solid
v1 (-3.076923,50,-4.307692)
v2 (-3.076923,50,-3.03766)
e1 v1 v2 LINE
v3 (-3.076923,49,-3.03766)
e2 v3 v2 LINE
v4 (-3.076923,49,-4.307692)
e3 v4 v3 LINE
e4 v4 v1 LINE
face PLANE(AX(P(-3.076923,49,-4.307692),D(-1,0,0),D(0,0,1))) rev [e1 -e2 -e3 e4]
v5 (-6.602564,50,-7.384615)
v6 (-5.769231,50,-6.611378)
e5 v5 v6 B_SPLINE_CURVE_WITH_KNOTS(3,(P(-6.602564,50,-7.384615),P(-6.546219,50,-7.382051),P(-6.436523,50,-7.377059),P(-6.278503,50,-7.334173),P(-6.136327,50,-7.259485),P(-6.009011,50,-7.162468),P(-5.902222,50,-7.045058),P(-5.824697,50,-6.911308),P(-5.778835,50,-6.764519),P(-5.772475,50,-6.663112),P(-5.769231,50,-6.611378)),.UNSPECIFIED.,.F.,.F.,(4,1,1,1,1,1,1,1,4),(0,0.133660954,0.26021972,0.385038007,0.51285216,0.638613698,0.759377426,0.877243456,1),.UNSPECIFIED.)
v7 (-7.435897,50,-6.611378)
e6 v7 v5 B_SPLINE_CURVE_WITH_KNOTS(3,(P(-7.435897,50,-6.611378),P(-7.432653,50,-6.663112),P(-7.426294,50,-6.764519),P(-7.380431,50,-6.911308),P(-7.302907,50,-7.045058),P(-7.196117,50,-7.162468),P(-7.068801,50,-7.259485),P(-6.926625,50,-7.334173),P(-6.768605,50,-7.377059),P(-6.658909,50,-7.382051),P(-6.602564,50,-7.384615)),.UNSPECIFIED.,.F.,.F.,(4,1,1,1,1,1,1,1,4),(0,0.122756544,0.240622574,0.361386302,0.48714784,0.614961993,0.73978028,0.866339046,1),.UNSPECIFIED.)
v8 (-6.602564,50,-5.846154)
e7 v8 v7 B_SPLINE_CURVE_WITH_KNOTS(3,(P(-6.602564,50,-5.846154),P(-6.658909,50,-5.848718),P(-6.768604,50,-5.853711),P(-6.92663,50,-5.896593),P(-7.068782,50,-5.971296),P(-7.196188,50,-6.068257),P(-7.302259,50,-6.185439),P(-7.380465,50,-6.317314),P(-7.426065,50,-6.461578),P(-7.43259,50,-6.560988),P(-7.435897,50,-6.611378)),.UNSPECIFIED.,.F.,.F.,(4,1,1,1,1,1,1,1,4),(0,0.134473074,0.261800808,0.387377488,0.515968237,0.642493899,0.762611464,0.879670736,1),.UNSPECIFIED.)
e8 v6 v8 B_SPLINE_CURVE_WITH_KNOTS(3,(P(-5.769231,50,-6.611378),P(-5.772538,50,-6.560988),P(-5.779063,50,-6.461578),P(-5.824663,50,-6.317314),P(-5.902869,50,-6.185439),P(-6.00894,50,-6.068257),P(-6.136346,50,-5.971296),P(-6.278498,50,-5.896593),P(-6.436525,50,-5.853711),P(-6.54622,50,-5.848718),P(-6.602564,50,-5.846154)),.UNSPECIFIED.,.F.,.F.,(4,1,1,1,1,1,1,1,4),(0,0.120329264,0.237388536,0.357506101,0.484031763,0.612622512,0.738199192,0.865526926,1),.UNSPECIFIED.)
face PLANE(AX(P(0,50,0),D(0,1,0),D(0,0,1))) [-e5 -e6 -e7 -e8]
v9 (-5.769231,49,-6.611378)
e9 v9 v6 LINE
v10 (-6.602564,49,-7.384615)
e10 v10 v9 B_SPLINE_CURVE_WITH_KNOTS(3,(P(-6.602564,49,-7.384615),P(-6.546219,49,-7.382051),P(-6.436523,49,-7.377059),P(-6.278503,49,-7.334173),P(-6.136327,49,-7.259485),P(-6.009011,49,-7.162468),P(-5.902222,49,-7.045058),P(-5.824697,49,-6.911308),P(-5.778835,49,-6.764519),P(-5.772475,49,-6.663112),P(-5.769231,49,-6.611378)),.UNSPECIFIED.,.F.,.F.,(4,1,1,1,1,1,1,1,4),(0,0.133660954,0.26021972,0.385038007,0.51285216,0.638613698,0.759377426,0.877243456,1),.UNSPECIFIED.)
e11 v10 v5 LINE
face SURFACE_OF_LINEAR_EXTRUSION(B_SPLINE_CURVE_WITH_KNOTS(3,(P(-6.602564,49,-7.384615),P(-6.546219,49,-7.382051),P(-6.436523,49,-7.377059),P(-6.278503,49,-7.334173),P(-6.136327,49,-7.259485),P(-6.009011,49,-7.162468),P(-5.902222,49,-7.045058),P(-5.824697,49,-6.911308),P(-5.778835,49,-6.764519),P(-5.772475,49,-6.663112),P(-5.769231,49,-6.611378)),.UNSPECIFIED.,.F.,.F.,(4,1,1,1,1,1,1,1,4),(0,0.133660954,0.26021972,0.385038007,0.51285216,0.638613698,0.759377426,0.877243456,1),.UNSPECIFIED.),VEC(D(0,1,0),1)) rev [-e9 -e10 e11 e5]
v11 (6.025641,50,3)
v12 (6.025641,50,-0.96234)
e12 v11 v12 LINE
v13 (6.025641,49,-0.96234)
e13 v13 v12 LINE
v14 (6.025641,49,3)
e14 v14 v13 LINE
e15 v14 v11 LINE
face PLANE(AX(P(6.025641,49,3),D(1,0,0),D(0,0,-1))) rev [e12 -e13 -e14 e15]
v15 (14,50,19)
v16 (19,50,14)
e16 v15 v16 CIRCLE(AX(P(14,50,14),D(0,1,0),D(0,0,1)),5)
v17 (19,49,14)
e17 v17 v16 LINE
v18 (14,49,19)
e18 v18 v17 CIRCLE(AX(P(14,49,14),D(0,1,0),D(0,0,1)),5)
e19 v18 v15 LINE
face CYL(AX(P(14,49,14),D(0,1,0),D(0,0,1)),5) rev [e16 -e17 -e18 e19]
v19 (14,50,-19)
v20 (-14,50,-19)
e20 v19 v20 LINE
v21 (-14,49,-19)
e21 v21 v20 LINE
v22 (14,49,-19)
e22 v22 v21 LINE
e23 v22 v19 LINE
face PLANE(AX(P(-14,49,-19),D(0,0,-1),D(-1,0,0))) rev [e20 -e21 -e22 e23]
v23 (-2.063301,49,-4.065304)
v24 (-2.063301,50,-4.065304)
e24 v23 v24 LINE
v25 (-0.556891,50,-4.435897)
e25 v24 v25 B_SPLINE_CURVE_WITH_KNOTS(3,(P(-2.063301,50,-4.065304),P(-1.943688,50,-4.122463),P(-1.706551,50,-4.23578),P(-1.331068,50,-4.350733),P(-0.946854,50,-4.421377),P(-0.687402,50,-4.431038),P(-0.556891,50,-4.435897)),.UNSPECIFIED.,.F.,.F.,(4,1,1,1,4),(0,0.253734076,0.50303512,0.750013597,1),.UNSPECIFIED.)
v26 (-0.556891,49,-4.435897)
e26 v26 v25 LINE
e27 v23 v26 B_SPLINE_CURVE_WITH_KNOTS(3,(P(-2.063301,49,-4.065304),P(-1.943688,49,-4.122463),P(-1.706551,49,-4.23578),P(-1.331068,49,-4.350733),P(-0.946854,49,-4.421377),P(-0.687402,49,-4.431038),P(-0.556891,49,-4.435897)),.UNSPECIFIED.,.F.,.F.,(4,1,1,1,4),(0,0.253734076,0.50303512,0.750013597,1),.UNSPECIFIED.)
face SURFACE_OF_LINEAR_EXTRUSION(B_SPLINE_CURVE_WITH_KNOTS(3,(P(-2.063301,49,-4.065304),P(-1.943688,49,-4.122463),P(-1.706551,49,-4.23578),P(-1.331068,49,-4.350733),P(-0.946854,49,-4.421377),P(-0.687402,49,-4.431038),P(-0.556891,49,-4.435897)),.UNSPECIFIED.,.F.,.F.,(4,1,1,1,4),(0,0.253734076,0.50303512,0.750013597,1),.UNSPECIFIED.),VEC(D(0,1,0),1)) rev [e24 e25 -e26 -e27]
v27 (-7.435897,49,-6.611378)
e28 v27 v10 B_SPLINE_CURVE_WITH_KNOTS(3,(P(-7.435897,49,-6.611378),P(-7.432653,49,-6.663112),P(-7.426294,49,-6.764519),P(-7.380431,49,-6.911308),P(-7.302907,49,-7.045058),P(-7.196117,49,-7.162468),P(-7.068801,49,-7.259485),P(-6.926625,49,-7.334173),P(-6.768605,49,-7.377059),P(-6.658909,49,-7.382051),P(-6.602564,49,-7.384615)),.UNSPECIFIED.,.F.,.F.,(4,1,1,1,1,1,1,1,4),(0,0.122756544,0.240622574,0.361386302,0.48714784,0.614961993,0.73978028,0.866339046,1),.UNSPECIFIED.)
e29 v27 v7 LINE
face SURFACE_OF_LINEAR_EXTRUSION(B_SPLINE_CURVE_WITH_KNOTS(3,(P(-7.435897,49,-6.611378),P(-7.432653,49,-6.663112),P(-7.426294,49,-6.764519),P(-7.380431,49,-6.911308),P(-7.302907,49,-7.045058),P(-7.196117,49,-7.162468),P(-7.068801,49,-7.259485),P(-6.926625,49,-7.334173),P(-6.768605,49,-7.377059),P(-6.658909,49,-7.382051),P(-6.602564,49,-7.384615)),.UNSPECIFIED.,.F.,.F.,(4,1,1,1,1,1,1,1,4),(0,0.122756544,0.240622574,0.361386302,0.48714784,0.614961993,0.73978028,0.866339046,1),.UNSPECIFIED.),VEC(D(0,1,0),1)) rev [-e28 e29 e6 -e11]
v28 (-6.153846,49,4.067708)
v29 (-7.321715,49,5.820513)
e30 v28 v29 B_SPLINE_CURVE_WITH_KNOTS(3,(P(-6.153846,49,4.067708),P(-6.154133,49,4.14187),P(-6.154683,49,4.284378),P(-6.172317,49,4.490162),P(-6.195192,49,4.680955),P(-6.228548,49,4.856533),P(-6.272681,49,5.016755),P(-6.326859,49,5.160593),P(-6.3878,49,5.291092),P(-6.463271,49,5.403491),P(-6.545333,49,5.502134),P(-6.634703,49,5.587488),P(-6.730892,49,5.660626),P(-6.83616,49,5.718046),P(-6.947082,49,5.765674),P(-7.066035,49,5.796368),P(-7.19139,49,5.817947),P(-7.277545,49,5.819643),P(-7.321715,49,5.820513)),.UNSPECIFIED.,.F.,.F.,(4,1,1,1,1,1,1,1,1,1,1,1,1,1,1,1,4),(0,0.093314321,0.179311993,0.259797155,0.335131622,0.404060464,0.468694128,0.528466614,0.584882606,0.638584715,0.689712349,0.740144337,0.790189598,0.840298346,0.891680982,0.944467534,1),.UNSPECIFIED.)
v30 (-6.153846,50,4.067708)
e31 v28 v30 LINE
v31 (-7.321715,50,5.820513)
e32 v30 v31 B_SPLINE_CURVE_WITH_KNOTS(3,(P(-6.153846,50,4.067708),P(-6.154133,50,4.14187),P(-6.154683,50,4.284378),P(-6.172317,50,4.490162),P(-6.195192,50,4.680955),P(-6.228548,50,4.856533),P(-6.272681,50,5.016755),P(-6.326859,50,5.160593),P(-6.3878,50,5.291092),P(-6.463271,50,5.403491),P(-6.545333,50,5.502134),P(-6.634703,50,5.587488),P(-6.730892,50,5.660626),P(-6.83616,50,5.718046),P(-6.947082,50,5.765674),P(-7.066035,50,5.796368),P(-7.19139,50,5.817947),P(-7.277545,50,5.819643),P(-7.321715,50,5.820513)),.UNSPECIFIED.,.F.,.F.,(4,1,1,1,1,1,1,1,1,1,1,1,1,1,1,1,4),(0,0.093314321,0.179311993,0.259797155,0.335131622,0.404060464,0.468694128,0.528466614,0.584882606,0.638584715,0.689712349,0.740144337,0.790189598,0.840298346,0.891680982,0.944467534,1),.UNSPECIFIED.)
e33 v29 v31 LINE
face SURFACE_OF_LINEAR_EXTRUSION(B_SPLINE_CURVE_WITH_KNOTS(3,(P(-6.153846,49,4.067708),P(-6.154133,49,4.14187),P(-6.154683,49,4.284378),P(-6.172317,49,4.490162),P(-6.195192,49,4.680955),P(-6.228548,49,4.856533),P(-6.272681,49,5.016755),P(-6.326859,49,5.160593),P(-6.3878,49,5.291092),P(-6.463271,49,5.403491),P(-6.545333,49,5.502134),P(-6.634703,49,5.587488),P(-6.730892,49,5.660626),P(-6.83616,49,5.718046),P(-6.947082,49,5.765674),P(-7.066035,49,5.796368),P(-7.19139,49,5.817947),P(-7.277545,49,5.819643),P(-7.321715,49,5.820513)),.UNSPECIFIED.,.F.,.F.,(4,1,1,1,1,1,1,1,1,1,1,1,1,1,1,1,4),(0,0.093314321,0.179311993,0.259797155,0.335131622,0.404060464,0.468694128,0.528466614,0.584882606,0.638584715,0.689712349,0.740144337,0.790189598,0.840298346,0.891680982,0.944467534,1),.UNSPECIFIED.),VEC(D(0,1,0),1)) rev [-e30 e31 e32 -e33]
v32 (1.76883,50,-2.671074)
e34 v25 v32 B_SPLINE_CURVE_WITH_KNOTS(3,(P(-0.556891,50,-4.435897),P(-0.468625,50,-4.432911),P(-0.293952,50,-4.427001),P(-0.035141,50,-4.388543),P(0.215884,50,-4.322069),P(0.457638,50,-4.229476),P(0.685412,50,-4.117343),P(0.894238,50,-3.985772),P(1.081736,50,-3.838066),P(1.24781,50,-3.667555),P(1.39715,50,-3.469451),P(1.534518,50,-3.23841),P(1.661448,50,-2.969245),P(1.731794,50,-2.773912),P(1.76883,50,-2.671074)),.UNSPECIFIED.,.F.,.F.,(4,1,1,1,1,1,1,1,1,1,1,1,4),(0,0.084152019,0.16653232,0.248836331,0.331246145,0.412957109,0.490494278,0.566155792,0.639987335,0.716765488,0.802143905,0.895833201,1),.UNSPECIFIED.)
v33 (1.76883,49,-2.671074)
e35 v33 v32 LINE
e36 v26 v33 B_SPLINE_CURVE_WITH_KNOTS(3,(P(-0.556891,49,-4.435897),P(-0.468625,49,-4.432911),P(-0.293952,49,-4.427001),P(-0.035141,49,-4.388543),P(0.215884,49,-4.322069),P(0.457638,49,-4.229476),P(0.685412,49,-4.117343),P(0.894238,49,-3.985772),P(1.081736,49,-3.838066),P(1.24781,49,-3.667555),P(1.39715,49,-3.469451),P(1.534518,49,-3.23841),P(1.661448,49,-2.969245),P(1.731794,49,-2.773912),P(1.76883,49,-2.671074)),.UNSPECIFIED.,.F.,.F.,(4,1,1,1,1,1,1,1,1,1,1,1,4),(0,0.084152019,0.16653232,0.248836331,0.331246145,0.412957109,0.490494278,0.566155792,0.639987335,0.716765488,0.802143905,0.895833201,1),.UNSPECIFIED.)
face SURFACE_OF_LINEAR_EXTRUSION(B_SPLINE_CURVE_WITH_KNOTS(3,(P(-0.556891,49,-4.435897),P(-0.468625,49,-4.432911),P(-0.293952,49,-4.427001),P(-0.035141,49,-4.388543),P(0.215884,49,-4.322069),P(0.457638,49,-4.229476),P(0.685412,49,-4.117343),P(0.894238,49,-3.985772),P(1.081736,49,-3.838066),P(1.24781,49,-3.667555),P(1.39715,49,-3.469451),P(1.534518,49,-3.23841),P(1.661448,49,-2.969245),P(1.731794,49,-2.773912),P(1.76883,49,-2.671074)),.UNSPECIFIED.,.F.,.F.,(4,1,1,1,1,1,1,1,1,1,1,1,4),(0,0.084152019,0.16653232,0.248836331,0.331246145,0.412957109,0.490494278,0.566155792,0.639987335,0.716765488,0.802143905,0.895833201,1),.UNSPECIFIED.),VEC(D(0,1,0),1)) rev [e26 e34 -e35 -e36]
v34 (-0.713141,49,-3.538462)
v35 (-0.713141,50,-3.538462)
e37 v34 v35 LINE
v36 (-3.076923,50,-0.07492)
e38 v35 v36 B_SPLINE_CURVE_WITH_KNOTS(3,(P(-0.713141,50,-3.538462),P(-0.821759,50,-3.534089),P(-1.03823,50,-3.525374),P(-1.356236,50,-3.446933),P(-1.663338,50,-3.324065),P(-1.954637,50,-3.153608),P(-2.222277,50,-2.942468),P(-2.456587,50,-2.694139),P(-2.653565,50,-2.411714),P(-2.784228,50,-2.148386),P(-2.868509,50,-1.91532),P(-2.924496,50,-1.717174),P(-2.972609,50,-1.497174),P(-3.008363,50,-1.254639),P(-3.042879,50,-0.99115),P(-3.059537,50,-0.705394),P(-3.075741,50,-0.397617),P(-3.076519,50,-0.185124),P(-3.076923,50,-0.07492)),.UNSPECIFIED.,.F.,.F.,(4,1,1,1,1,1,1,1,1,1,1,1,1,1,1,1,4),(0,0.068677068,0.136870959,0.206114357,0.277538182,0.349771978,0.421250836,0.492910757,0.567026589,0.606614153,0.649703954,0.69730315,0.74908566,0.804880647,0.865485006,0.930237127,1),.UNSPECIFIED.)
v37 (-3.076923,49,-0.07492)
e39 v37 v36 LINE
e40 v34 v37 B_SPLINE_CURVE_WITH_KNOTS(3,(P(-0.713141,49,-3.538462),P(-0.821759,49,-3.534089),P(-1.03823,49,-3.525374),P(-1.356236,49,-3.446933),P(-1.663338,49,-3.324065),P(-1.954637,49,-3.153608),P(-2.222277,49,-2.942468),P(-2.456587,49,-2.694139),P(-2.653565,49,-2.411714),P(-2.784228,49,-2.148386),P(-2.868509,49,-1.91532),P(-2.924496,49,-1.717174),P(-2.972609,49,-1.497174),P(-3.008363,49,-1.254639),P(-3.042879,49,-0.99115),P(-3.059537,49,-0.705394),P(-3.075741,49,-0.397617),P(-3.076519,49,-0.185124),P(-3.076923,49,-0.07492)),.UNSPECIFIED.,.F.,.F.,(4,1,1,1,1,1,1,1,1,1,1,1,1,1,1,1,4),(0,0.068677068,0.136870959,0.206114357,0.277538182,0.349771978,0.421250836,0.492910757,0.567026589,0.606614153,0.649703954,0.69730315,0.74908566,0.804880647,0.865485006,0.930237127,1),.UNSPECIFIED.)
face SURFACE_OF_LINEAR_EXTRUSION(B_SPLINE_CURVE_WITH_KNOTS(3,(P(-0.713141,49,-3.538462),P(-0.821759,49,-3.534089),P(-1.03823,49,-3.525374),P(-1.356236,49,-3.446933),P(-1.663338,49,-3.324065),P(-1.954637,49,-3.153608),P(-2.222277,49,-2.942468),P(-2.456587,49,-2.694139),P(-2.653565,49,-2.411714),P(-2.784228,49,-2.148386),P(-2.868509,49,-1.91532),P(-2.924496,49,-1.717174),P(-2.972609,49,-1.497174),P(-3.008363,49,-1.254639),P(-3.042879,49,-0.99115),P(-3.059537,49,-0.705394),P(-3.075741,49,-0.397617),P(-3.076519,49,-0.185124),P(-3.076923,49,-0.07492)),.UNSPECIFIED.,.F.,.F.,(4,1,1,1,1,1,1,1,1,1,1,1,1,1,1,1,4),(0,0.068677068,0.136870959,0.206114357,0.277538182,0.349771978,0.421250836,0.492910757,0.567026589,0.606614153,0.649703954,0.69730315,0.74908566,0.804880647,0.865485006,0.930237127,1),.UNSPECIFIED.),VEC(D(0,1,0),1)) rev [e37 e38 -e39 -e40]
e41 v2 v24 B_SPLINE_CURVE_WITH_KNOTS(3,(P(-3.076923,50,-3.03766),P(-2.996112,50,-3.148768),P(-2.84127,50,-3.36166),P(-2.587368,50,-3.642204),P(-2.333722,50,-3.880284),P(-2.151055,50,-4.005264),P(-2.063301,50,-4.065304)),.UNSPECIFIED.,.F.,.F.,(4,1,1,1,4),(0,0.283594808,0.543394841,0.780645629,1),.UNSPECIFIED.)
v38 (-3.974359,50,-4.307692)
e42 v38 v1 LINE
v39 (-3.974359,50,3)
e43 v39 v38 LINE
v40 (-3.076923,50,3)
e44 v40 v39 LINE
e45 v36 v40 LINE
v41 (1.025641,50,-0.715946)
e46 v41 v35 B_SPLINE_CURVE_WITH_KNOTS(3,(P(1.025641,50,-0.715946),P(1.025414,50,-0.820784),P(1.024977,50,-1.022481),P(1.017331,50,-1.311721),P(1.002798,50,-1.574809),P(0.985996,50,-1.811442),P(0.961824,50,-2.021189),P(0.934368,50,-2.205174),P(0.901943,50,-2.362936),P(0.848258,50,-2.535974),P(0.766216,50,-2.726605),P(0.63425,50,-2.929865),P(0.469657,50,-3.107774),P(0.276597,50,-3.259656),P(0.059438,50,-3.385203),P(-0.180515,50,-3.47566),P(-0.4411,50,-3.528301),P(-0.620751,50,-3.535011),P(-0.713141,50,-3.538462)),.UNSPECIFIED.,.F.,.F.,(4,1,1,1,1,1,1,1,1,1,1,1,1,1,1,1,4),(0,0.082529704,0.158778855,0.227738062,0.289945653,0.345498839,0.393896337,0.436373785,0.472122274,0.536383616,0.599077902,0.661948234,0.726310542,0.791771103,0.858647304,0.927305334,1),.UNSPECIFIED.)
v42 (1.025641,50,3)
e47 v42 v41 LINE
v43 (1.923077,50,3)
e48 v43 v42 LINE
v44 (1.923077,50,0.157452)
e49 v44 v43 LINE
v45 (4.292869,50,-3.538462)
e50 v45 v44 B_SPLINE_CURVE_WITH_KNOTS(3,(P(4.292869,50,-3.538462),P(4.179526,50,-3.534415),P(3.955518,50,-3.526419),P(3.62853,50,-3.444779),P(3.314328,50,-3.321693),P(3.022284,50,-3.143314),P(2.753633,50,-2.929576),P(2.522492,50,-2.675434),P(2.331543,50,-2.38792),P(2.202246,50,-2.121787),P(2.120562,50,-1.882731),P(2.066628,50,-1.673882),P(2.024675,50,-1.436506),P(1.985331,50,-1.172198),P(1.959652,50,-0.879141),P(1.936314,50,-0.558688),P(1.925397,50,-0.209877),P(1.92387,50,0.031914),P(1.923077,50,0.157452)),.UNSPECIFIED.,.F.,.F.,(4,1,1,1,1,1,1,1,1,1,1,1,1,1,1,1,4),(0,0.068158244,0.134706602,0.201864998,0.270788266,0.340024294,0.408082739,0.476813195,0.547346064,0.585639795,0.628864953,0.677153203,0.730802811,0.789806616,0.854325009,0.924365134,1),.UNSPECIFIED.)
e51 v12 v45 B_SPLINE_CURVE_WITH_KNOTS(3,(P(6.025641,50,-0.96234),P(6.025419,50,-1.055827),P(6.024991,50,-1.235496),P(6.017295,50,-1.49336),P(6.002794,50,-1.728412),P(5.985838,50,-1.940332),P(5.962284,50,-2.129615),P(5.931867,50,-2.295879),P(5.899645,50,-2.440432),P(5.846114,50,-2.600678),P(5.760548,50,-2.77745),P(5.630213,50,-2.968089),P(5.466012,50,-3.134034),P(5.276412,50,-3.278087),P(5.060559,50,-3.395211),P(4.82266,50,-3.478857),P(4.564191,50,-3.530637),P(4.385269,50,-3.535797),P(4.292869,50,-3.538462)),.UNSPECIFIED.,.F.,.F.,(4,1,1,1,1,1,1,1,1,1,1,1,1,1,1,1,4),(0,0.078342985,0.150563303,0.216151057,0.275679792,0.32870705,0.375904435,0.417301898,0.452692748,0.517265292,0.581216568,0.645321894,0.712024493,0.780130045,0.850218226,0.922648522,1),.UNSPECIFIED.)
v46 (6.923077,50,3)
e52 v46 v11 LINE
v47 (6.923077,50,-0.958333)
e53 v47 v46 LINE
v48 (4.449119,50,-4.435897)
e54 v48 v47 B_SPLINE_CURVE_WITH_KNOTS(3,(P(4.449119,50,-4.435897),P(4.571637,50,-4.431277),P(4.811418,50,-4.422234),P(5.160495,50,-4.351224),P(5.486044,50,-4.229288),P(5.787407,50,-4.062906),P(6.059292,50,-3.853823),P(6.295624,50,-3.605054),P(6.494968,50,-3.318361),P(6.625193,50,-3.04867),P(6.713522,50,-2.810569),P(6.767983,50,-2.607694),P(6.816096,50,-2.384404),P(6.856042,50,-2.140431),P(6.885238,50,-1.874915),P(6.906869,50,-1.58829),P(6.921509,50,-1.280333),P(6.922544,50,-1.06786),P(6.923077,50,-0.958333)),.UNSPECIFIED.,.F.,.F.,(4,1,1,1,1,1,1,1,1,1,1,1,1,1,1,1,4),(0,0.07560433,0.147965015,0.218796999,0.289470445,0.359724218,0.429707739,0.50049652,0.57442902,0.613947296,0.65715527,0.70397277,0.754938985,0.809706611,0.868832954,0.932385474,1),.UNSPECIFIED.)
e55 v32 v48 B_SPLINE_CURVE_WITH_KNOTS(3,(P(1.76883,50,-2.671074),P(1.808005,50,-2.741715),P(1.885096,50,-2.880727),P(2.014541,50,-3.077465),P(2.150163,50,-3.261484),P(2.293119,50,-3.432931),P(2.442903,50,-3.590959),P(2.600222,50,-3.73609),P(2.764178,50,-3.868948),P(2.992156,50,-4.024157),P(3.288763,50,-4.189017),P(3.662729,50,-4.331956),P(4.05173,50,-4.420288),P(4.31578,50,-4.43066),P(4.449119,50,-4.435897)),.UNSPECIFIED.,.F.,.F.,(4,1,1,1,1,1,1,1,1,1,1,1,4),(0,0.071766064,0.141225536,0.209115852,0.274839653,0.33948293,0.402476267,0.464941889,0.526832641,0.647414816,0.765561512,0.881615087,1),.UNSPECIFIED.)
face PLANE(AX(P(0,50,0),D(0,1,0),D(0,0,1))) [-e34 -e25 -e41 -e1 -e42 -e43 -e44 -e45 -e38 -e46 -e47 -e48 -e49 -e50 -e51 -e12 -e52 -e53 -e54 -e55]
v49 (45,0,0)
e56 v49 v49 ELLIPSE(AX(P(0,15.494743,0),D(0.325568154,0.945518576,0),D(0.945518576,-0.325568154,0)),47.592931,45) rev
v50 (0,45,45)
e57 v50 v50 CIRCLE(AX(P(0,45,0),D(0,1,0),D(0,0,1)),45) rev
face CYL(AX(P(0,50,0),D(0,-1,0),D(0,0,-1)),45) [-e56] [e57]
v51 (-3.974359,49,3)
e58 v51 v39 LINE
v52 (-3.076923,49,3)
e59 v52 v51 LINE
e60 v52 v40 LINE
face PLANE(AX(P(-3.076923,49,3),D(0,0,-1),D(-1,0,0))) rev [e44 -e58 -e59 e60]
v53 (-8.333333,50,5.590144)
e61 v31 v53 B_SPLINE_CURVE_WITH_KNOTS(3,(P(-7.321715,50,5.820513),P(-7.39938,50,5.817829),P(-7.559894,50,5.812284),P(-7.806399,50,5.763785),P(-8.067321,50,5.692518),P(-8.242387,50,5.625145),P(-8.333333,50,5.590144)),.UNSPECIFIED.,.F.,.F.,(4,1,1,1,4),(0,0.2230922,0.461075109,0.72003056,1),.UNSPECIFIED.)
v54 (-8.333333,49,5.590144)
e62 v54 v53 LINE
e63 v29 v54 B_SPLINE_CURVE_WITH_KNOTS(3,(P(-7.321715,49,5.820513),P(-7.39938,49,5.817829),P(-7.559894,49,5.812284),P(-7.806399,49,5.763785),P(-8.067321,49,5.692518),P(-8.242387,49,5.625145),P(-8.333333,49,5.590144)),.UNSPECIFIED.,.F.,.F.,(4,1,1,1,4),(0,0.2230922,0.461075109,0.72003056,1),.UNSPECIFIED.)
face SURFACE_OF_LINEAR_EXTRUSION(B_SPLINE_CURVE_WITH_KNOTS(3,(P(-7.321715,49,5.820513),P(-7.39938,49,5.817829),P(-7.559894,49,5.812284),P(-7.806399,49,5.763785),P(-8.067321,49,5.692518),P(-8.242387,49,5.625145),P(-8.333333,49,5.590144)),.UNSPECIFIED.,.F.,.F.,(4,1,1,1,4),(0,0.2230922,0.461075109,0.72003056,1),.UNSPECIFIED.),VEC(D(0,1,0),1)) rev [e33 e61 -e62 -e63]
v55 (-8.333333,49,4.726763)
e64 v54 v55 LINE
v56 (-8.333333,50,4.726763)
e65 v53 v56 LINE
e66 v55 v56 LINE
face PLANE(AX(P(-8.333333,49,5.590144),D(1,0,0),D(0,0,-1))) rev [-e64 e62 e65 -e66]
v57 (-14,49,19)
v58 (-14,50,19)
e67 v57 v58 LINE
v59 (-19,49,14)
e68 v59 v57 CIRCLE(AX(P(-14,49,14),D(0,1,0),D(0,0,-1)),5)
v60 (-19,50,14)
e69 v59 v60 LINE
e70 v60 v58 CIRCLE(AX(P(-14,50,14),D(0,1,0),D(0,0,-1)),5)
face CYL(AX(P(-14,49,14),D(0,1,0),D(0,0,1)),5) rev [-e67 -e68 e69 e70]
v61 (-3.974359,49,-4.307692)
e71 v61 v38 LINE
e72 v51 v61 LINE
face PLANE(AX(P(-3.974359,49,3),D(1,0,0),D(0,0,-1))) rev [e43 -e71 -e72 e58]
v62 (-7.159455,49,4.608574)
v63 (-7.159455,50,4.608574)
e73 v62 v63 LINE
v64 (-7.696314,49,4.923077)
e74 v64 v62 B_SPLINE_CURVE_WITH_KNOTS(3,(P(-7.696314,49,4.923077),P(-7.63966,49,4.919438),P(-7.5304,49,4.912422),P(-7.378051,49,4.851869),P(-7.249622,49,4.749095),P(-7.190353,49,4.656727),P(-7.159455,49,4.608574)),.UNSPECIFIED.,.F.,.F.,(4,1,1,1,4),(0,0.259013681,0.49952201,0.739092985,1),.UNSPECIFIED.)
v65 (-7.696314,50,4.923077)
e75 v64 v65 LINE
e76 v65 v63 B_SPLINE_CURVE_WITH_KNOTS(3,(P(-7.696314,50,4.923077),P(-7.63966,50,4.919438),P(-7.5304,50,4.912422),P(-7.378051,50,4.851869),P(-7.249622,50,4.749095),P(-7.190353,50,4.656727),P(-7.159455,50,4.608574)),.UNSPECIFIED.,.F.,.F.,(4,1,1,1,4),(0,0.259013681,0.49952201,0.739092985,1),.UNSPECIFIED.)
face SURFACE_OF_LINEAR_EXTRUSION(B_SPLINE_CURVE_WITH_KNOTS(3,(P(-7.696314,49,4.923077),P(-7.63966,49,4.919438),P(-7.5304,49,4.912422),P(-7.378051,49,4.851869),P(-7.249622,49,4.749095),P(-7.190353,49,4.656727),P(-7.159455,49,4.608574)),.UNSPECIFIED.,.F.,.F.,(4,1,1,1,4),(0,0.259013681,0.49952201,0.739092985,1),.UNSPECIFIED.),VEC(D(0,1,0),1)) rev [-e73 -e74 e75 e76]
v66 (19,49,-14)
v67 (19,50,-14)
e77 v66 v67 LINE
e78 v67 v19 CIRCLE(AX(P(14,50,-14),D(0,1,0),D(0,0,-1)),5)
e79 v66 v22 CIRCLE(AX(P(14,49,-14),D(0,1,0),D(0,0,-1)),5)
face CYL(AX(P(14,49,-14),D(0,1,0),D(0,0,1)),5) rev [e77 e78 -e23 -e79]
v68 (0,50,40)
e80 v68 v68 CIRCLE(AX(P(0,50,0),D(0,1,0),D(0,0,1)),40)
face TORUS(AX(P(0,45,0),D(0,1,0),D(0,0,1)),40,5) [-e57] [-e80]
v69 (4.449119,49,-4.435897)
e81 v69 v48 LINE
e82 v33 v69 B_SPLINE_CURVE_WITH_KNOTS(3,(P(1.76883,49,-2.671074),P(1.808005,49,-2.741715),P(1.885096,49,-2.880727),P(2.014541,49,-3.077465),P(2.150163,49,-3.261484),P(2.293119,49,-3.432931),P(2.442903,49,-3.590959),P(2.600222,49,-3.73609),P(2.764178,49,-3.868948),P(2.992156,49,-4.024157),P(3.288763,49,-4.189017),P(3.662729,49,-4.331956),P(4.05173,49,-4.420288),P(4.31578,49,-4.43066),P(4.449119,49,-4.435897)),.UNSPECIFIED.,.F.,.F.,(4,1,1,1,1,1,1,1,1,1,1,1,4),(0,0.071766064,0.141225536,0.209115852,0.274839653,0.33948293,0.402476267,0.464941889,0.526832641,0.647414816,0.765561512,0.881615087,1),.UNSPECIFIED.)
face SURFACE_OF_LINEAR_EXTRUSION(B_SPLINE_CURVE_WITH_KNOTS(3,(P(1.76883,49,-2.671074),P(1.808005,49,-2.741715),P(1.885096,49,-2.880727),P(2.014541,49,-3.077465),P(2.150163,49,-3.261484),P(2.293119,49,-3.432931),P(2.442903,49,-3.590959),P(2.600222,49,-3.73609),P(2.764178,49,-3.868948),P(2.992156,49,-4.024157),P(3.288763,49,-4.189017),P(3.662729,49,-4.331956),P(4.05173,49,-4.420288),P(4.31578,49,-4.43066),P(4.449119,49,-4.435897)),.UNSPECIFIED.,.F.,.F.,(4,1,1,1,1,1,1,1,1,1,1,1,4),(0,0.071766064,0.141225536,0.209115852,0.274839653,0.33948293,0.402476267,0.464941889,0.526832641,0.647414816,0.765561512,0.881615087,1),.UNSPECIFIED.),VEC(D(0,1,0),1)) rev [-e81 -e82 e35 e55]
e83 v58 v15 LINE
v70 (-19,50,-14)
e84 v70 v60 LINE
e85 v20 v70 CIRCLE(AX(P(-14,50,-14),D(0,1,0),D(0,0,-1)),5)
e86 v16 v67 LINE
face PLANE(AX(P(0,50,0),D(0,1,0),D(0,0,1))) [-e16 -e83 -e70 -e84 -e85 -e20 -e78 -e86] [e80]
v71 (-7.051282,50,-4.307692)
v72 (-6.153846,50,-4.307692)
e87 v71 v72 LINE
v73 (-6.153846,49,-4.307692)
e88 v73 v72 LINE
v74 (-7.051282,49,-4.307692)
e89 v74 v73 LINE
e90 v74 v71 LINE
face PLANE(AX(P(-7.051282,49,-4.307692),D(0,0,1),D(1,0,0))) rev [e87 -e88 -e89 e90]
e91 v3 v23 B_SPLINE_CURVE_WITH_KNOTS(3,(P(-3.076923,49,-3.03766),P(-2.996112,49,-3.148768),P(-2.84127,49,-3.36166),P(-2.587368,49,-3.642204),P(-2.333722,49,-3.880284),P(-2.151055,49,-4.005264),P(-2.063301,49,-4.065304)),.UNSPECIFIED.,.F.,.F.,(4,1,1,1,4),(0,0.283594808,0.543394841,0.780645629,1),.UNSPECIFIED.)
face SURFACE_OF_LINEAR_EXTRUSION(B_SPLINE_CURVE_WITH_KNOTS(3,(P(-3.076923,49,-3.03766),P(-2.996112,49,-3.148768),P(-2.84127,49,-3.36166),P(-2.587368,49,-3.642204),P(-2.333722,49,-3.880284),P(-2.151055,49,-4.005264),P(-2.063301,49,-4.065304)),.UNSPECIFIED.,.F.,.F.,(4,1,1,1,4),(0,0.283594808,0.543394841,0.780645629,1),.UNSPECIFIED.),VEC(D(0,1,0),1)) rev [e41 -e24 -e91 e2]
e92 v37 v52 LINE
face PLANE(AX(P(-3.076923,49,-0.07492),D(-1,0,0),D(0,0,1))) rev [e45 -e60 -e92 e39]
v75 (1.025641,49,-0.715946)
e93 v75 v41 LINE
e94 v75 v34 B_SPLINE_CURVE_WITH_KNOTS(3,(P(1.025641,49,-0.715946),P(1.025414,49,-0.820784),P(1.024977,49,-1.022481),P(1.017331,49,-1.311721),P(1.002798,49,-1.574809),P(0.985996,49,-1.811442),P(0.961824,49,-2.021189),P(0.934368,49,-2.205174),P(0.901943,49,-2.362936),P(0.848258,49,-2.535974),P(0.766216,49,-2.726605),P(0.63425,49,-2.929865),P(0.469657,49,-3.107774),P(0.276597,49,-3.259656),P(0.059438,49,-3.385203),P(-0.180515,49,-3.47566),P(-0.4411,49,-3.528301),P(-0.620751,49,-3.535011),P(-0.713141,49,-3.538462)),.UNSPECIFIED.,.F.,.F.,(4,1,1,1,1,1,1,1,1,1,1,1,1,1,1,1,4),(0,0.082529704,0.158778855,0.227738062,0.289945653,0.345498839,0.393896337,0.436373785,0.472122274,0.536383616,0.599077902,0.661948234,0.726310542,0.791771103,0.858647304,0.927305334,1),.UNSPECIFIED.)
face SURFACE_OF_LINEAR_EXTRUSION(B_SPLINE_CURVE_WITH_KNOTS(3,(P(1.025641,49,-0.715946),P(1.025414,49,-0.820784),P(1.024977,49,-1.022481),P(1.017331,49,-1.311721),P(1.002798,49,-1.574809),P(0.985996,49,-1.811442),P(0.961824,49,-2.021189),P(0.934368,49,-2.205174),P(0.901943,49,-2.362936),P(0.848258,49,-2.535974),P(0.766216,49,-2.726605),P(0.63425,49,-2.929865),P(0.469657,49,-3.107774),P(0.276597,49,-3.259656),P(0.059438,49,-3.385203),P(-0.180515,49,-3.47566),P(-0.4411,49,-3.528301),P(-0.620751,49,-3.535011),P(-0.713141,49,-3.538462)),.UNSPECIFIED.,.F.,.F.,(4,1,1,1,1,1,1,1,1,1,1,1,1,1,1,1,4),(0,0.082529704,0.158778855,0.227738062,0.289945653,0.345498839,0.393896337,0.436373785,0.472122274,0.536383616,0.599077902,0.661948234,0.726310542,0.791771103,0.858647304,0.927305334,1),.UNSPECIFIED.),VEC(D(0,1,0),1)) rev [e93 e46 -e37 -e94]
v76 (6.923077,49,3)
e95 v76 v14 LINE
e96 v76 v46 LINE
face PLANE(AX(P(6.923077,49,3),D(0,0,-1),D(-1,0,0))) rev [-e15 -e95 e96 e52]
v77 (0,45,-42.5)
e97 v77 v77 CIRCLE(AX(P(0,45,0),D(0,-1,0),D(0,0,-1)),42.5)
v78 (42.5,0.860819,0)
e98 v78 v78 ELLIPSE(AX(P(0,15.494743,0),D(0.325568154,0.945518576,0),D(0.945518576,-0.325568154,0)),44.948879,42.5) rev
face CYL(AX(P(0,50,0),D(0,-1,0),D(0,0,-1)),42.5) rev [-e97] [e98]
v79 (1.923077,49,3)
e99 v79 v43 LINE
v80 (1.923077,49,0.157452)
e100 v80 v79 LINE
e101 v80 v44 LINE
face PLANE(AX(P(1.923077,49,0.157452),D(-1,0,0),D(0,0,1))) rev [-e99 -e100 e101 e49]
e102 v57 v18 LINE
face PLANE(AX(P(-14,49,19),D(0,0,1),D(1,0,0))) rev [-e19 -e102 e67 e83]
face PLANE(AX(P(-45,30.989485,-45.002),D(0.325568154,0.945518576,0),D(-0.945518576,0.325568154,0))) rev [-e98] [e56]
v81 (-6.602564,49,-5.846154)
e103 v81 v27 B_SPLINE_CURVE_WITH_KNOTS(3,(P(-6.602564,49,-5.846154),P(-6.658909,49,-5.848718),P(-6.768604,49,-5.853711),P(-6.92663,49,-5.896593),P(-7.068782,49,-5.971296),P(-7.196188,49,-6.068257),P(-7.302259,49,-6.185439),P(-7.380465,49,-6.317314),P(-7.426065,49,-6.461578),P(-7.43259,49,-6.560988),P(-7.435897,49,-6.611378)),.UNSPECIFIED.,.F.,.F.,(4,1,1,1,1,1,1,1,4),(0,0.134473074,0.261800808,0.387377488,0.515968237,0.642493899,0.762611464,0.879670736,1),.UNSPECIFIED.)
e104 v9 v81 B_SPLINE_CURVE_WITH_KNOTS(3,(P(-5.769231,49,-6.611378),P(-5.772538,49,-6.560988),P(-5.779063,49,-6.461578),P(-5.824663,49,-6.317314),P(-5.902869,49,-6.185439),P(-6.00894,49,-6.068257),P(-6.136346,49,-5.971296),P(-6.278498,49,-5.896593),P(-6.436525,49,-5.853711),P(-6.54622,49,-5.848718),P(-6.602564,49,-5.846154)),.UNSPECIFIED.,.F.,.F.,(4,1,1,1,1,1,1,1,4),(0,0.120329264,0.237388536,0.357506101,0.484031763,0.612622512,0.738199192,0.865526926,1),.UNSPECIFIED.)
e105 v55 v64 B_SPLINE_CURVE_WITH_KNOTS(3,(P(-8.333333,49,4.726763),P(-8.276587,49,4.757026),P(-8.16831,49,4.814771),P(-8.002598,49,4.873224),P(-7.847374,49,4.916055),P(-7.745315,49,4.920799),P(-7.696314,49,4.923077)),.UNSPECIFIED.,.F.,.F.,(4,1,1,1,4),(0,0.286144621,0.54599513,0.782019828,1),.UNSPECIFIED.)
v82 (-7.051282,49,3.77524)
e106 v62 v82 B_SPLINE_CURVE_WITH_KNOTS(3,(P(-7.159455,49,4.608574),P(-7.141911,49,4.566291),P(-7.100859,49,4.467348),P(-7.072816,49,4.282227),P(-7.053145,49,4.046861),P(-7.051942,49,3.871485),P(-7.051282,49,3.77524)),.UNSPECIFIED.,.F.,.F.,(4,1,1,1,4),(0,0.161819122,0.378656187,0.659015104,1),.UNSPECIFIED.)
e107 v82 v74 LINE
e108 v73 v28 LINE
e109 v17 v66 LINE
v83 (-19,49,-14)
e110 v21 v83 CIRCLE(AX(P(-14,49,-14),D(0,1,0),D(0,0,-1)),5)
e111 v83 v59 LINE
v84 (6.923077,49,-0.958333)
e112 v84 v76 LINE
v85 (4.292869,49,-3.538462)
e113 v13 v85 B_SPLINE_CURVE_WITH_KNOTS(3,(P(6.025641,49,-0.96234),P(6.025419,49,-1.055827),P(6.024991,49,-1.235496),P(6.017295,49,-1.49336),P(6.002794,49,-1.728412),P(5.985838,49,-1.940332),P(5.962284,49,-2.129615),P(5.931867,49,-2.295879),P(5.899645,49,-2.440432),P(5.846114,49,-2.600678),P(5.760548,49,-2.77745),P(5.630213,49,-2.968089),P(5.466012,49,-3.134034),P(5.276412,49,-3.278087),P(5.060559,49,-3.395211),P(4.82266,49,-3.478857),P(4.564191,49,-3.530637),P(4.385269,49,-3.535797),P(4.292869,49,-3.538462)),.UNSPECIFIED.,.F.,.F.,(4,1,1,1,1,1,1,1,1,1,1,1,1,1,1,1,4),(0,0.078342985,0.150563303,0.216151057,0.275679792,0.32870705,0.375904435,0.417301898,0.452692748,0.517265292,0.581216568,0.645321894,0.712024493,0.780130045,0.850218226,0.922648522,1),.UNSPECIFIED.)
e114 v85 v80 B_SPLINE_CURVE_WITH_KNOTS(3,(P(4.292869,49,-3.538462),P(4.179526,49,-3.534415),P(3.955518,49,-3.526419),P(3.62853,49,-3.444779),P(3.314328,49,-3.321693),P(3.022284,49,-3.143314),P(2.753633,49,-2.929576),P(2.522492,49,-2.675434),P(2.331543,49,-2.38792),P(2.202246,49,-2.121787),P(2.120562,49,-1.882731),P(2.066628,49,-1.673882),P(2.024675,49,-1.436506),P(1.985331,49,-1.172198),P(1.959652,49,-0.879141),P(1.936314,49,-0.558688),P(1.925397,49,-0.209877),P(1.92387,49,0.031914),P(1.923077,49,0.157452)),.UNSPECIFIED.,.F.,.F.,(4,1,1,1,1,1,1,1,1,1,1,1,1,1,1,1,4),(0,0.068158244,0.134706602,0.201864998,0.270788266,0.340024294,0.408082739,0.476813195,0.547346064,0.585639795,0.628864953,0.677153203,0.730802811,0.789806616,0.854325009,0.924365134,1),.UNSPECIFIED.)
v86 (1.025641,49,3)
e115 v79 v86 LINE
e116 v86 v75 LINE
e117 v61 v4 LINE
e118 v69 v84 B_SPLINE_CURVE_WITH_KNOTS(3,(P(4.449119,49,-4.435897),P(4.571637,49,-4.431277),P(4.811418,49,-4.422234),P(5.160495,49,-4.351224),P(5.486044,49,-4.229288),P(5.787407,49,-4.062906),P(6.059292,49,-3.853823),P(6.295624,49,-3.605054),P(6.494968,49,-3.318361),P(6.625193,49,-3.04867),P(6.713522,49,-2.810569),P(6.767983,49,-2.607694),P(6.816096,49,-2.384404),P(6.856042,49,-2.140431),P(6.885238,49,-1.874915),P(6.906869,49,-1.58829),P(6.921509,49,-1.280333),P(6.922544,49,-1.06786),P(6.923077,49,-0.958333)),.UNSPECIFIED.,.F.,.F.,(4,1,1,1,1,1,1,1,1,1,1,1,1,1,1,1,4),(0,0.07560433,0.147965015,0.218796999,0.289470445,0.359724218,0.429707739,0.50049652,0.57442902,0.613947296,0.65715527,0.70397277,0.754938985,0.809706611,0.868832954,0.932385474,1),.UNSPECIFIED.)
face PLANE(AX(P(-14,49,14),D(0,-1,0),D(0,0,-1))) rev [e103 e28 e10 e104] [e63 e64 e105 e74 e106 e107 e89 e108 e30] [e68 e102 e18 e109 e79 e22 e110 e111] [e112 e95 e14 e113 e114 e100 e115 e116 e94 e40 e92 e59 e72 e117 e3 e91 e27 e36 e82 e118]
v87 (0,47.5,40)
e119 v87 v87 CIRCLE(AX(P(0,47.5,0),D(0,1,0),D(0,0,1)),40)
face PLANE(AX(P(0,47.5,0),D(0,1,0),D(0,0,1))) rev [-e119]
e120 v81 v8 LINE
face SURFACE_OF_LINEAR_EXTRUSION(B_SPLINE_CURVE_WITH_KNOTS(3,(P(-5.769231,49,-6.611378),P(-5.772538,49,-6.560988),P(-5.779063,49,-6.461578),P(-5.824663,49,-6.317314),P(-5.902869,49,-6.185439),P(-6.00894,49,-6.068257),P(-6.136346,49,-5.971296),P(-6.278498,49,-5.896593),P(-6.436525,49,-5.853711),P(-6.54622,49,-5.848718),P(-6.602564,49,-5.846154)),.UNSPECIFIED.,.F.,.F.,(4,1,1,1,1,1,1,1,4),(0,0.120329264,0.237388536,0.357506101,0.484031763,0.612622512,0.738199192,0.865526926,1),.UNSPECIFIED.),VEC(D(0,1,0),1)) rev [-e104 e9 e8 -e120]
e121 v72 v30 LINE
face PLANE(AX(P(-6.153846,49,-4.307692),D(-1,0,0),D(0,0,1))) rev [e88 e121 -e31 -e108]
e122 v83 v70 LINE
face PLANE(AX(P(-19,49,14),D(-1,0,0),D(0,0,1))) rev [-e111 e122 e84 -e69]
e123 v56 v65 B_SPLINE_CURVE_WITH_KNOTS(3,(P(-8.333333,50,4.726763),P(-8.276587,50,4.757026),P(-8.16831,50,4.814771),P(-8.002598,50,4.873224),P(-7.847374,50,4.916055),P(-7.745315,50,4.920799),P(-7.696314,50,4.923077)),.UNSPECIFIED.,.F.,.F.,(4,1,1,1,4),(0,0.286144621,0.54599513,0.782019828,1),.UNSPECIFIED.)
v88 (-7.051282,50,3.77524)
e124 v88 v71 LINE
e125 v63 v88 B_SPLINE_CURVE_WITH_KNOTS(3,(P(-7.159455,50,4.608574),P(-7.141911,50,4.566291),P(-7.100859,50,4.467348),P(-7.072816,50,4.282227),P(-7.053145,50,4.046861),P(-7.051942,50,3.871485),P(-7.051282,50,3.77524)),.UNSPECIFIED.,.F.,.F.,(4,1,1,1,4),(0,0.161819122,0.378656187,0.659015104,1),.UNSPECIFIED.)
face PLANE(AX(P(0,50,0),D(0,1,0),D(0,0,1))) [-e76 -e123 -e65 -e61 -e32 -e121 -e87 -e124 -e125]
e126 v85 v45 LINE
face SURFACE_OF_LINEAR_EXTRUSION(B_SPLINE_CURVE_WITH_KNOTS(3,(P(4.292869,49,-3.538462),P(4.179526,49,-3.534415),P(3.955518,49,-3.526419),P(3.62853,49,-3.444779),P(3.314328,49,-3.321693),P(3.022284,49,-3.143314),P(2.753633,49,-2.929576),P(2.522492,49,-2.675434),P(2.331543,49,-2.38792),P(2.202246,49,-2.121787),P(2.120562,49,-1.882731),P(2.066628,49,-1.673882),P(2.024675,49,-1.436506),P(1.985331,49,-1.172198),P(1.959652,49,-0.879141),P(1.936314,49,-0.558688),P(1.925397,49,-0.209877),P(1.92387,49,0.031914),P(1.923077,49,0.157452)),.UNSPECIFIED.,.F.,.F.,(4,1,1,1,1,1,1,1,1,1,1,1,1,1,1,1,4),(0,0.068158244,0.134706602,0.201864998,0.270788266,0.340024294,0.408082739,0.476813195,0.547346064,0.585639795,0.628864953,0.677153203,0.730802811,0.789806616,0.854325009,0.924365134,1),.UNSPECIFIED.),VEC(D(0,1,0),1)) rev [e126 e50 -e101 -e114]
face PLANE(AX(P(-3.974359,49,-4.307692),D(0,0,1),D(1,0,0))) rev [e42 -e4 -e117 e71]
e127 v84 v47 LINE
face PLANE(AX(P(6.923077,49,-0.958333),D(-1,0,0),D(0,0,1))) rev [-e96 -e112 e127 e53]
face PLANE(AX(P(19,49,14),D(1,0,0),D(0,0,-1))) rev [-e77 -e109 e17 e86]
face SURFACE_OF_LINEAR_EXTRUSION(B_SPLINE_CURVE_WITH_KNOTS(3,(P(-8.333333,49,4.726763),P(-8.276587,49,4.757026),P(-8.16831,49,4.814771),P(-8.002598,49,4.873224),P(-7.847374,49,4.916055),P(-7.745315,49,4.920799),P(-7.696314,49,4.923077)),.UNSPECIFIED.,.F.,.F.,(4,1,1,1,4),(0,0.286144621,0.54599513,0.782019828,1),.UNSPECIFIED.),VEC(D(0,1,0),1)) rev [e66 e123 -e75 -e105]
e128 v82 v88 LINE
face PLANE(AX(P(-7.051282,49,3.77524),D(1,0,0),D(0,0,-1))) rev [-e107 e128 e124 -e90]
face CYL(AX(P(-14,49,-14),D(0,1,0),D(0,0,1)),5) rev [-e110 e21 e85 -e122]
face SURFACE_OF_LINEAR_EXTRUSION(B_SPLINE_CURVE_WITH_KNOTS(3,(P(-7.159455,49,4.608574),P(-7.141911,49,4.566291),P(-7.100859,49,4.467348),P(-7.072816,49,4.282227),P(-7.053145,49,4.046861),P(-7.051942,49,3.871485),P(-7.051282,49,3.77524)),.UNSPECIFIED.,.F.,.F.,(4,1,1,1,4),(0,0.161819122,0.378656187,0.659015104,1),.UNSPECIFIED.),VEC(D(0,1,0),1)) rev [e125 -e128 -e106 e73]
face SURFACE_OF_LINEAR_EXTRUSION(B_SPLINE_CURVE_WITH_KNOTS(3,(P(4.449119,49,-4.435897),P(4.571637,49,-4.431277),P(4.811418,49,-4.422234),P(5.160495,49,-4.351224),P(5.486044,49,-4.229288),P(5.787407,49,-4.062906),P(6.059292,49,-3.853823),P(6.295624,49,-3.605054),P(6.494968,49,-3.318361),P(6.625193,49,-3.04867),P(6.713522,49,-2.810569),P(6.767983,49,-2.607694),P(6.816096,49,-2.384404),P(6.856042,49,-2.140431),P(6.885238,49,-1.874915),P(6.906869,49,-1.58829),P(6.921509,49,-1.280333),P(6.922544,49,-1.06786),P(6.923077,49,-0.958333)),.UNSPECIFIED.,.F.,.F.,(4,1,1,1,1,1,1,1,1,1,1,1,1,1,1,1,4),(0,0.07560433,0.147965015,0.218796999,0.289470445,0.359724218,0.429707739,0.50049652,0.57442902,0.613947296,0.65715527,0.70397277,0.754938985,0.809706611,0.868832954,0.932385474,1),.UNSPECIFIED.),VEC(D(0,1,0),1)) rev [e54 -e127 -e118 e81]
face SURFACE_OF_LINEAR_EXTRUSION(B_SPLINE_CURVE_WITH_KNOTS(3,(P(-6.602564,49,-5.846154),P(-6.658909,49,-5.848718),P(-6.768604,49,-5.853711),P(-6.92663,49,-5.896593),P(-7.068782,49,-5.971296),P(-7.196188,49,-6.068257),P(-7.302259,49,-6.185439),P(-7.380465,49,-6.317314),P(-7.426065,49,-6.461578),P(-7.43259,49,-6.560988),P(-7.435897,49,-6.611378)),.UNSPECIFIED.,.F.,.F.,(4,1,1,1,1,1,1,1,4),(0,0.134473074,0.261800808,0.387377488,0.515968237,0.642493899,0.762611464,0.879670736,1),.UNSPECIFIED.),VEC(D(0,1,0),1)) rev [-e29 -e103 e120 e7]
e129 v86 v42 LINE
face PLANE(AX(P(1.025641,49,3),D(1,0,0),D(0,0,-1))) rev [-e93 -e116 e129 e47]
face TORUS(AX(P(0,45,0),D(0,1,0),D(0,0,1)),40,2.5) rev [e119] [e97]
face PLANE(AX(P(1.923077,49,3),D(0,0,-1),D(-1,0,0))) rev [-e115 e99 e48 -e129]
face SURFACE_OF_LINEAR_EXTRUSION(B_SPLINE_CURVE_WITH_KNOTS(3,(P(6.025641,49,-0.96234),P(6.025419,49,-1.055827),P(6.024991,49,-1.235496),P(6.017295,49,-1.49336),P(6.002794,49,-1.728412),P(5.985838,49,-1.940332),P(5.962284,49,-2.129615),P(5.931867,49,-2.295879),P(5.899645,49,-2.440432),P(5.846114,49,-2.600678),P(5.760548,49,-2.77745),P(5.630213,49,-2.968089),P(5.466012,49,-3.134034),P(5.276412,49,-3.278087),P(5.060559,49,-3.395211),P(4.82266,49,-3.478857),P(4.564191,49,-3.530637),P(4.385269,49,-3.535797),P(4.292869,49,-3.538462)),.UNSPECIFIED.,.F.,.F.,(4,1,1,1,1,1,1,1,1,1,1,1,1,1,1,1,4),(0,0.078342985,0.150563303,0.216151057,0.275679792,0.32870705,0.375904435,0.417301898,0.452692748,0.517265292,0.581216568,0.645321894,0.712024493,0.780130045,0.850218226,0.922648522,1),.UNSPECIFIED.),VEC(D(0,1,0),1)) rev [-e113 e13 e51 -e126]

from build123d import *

# Parameters (mm, degrees)
SKETCH1_R                      = 45
BOSS_EXTRUDE1_DEPTH            = 50
CUT_EXTRUDE1_REACH             = 82.932
CUT_EXTRUDE1_DIRECTION_2_REACH = 82.932
FILLET1_R                      = 5
CUT_EXTRUDE2_DEPTH             = 1


# Read off the part's stored shape, not the designer's step: Shell1
with BuildPart() as part:
    # Sketch1 → Boss-Extrude1 (new body)
    with BuildSketch(Plane(origin=(0, 0, 0), x_dir=(1, 0, 0), z_dir=(0, 1, 0))):
        with Locations(Location((0, 0, 0), (0, 0, 270))):
            Circle(SKETCH1_R)
    extrude(amount=BOSS_EXTRUDE1_DEPTH)

    # Sketch2 → Cut-Extrude1 (cut, up to next)
    with BuildSketch(Plane.XY, mode=Mode.PRIVATE) as cut_extrude1_sk1:
        Polygon((45, 0), (-45, 0), (-45, 30.989485196), align=None)
    cut_extrude1_tool1 = extrude(cut_extrude1_sk1.sketch, amount=-CUT_EXTRUDE1_REACH, mode=Mode.PRIVATE) & part.part
    add(cut_extrude1_tool1.solids().sort_by_distance((-15, 10.329828, 0))[0], mode=Mode.SUBTRACT)

    # Sketch2 → Cut-Extrude1 direction 2 (cut, up to next)
    with BuildSketch(Plane.XY, mode=Mode.PRIVATE) as cut_extrude1_direction_2_sk1:
        Polygon((45, 0), (-45, 0), (-45, 30.989485196), align=None)
    cut_extrude1_direction_2_tool1 = extrude(cut_extrude1_direction_2_sk1.sketch, amount=CUT_EXTRUDE1_DIRECTION_2_REACH, mode=Mode.PRIVATE) & part.part
    add(cut_extrude1_direction_2_tool1.solids().sort_by_distance((-15, 10.329828, 0))[0], mode=Mode.SUBTRACT)

    # Fillet1
    fillet1_edges = [part.edges().sort_by_distance(p)[0] for p in [
        (0, 50, -45),
    ]]
    fillet(fillet1_edges, radius=FILLET1_R)

    # Shell1 outline → Shell1 (revolve, cut)
    with BuildSketch(Plane.XY):
        with BuildLine():
            Line((42.5, 0.853247443), (42.5, 45))
            ThreePointArc((42.5, 45), (41.767766953, 46.767766953), (40, 47.5))
            Line((40, 47.5), (0, 47.5))
            Line((0, 47.5), (0, 0.853247443))
            Line((0, 0.853247443), (42.5, 0.853247443))
        make_face()
    revolve(axis=Axis((0, 0, 0), (0, 1, 0)), mode=Mode.SUBTRACT)

    # Sketch3 → Cut-Extrude2 (cut)
    with BuildSketch(Plane(origin=(0, 50, 0), x_dir=(1, 0, 0), z_dir=(0, 1, 0))):
        with BuildLine():
            Line((-14, -19), (14, -19))
            ThreePointArc((14, -19), (17.535533906, -17.535533906), (19, -14))
            Line((19, -14), (19, 14))
            ThreePointArc((19, 14), (17.535533906, 17.535533906), (14, 19))
            Line((14, 19), (-14, 19))
            ThreePointArc((-14, 19), (-17.535533906, 17.535533906), (-19, 14))
            Line((-19, 14), (-19, -14))
            ThreePointArc((-19, -14), (-17.535533906, -17.535533906), (-14, -19))
        make_face()
        with BuildLine():
            add(Edge.make_bspline(
                [(-6.602564103, 7.384615385), (-6.546219207, 7.382051156), (-6.436523351, 7.377058951), (-6.278503166, 7.334172743), (-6.136327345, 7.259484797), (-6.009011428, 7.162468173), (-5.90222163, 7.045057839), (-5.824697029, 6.911307595), (-5.778834699, 6.764519327), (-5.772475164, 6.663112259), (-5.769230769, 6.611378205)],
                knots=[0, 0, 0, 0, 1.06928763, 2.081757757, 3.080304056, 4.102817284, 5.108909582, 6.075019406, 7.017947647, 8, 8, 8, 8], degree=3))
            add(Edge.make_bspline(
                [(-5.769230769, 6.611378205), (-5.772538286, 6.56098822), (-5.779063437, 6.461577616), (-5.824662885, 6.317314259), (-5.902869178, 6.185439169), (-6.008939934, 6.068256987), (-6.136346112, 5.971296003), (-6.278498143, 5.896593392), (-6.436524697, 5.85371111), (-6.546219664, 5.848718356), (-6.602564103, 5.846153846)],
                knots=[0, 0, 0, 0, 0.962634111, 1.899108286, 2.860048811, 3.872254101, 4.900980094, 5.905593535, 6.924215405, 8, 8, 8, 8], degree=3))
            add(Edge.make_bspline(
                [(-6.602564103, 5.846153846), (-6.658908541, 5.848718356), (-6.768603508, 5.85371111), (-6.926630062, 5.896593392), (-7.068782093, 5.971296003), (-7.196188271, 6.068256987), (-7.302259027, 6.185439169), (-7.38046532, 6.317314259), (-7.426064769, 6.461577616), (-7.432589919, 6.56098822), (-7.435897436, 6.611378205)],
                knots=[0, 0, 0, 0, 1.075784595, 2.094406465, 3.099019906, 4.127745899, 5.139951189, 6.100891714, 7.037365889, 8, 8, 8, 8], degree=3))
            add(Edge.make_bspline(
                [(-7.435897436, 6.611378205), (-7.432653041, 6.663112259), (-7.426293506, 6.764519327), (-7.380431176, 6.911307595), (-7.302906576, 7.045057839), (-7.196116777, 7.162468173), (-7.068800861, 7.259484797), (-6.926625039, 7.334172743), (-6.768604854, 7.377058951), (-6.658908998, 7.382051156), (-6.602564103, 7.384615385)],
                knots=[0, 0, 0, 0, 0.982052353, 1.924980594, 2.891090418, 3.897182716, 4.919695944, 5.918242243, 6.93071237, 8, 8, 8, 8], degree=3))
        make_face(mode=Mode.SUBTRACT)
        with BuildLine():
            Line((-7.051282051, 4.307692308), (-6.153846154, 4.307692308))
            Line((-6.153846154, 4.307692308), (-6.153846154, -4.067708333))
            add(Edge.make_bspline(
                [(-6.153846154, -4.067708333), (-6.154132606, -4.141869875), (-6.15468305, -4.284378053), (-6.172317042, -4.49016243), (-6.195192124, -4.680954673), (-6.228547736, -4.856533408), (-6.272681208, -5.016754586), (-6.326858883, -5.160593298), (-6.387799564, -5.291092499), (-6.463270778, -5.403491101), (-6.545332797, -5.502134381), (-6.634703123, -5.587487965), (-6.7308923, -5.660626224), (-6.836160171, -5.7180461), (-6.947081727, -5.765673789), (-7.066034551, -5.796368416), (-7.191389698, -5.817947311), (-7.277545042, -5.819643319), (-7.321714744, -5.820512821)],
                knots=[0, 0, 0, 0, 1.493029139, 2.868991889, 4.156754484, 5.362105958, 6.464967428, 7.499106053, 8.455465818, 9.358121702, 10.217355437, 11.035397588, 11.842309395, 12.643033568, 13.444773531, 14.266895717, 15.11148054, 16, 16, 16, 16], degree=3))
            add(Edge.make_bspline(
                [(-7.321714744, -5.820512821), (-7.399379833, -5.817829424), (-7.559893914, -5.812283524), (-7.806399323, -5.763785397), (-8.067320709, -5.692518214), (-8.242387038, -5.625144579), (-8.333333333, -5.590144231)],
                knots=[0, 0, 0, 0, 0.892368802, 1.844300437, 2.88012224, 4, 4, 4, 4], degree=3))
            Line((-8.333333333, -5.590144231), (-8.333333333, -4.726762821))
            add(Edge.make_bspline(
                [(-8.333333333, -4.726762821), (-8.276587466, -4.757025769), (-8.168310166, -4.814770775), (-8.002598459, -4.873223953), (-7.847373694, -4.916054943), (-7.745315187, -4.920799116), (-7.696314103, -4.923076923)],
                knots=[0, 0, 0, 0, 1.144578483, 2.183980519, 3.128079311, 4, 4, 4, 4], degree=3))
            add(Edge.make_bspline(
                [(-7.696314103, -4.923076923), (-7.639660339, -4.919438476), (-7.530400465, -4.912421532), (-7.378051109, -4.85186899), (-7.24962178, -4.749094843), (-7.190352916, -4.656726685), (-7.159455128, -4.608573718)],
                knots=[0, 0, 0, 0, 1.036054724, 1.998088038, 2.956371939, 4, 4, 4, 4], degree=3))
            add(Edge.make_bspline(
                [(-7.159455128, -4.608573718), (-7.141911229, -4.566290667), (-7.100858564, -4.467348473), (-7.072816103, -4.28222691), (-7.053144834, -4.04686094), (-7.051942097, -3.871484533), (-7.051282051, -3.775240385)],
                knots=[0, 0, 0, 0, 0.647276487, 1.514624746, 2.636060416, 4, 4, 4, 4], degree=3))
            Line((-7.051282051, -3.775240385), (-7.051282051, 4.307692308))
        make_face(mode=Mode.SUBTRACT)
        with BuildLine():
            Line((-3.974358974, 4.307692308), (-3.076923077, 4.307692308))
            Line((-3.076923077, 4.307692308), (-3.076923077, 3.037660256))
            add(Edge.make_bspline(
                [(-3.076923077, 3.037660256), (-2.996111791, 3.14876769), (-2.841269621, 3.361660184), (-2.587367757, 3.642203854), (-2.333721721, 3.880284296), (-2.151054916, 4.005263929), (-2.063301282, 4.065304487)],
                knots=[0, 0, 0, 0, 1.134379233, 2.173579362, 3.122582517, 4, 4, 4, 4], degree=3))
            add(Edge.make_bspline(
                [(-2.063301282, 4.065304487), (-1.943687962, 4.122462674), (-1.706551105, 4.235780426), (-1.331067605, 4.350733452), (-0.946854264, 4.421376598), (-0.687402224, 4.431037665), (-0.556891026, 4.435897436)],
                knots=[0, 0, 0, 0, 1.014936303, 2.012140481, 3.000054389, 4, 4, 4, 4], degree=3))
            add(Edge.make_bspline(
                [(-0.556891026, 4.435897436), (-0.468625321, 4.432910891), (-0.293952238, 4.427000679), (-0.035140552, 4.388543435), (0.215884053, 4.322068655), (0.457638423, 4.229476301), (0.685411792, 4.11734291), (0.894238071, 3.985772316), (1.081735809, 3.838066386), (1.247810241, 3.667555149), (1.397150314, 3.469450582), (1.534518447, 3.238409871), (1.661447625, 2.969245125), (1.731794222, 2.773912151), (1.768830128, 2.671073718)],
                knots=[0, 0, 0, 0, 1.009824226, 1.998387844, 2.986035974, 3.974953746, 4.955485308, 5.885931332, 6.793869504, 7.679848016, 8.601185859, 9.625726857, 10.749998409, 12, 12, 12, 12], degree=3))
            add(Edge.make_bspline(
                [(1.768830128, 2.671073718), (1.808005132, 2.741714916), (1.885096038, 2.880726873), (2.014540715, 3.077464765), (2.150162991, 3.26148417), (2.293118686, 3.432931097), (2.442903219, 3.590958898), (2.600221506, 3.736090046), (2.764178024, 3.868947799), (2.992155853, 4.024156826), (3.288763302, 4.189017345), (3.662729344, 4.331955756), (4.051729835, 4.420287551), (4.315780401, 4.430659759), (4.44911859, 4.435897436)],
                knots=[0, 0, 0, 0, 0.86119277, 1.694706429, 2.50939023, 3.298075842, 4.073795165, 4.829715201, 5.57930267, 6.321991688, 7.768977793, 9.186738141, 10.579381044, 12, 12, 12, 12], degree=3))
            add(Edge.make_bspline(
                [(4.44911859, 4.435897436), (4.571637055, 4.431276805), (4.811417587, 4.422233781), (5.160495489, 4.351223858), (5.486043504, 4.229287723), (5.787406579, 4.062905904), (6.05929176, 3.853822523), (6.295624072, 3.605054416), (6.494967967, 3.318361207), (6.625192652, 3.048669811), (6.713521979, 2.81056886), (6.767982648, 2.607693742), (6.816096063, 2.384403591), (6.856042478, 2.140431415), (6.885238341, 1.874915391), (6.906868956, 1.588290032), (6.921509167, 1.28033257), (6.922543659, 1.067859712), (6.923076923, 0.958333333)],
                knots=[0, 0, 0, 0, 1.209669288, 2.367440248, 3.500751976, 4.631527125, 5.755587489, 6.87532382, 8.007944318, 9.190864318, 9.82315674, 10.514484317, 11.263564316, 12.079023757, 12.955305781, 13.901327259, 14.918167583, 16, 16, 16, 16], degree=3))
            Line((6.923076923, 0.958333333), (6.923076923, -3))
            Line((6.923076923, -3), (6.025641026, -3))
            Line((6.025641026, -3), (6.025641026, 0.962339744))
            add(Edge.make_bspline(
                [(6.025641026, 0.962339744), (6.025418503, 1.055827098), (6.024990848, 1.235495574), (6.017294758, 1.493359721), (6.00279386, 1.72841217), (5.98583775, 1.940332422), (5.962284009, 2.129614675), (5.931867061, 2.295878728), (5.899645118, 2.440432474), (5.846113715, 2.600678325), (5.76054831, 2.777450355), (5.630212653, 2.968089143), (5.46601235, 3.134034286), (5.276411902, 3.27808662), (5.060559203, 3.395211309), (4.822659994, 3.478857051), (4.564191275, 3.530636703), (4.385269023, 3.535796748), (4.29286859, 3.538461538)],
                knots=[0, 0, 0, 0, 1.253487763, 2.409012846, 3.458416907, 4.410876679, 5.259312806, 6.014470957, 6.676830364, 7.243083969, 8.276244668, 9.299465089, 10.325150304, 11.392391894, 12.482080715, 13.603491619, 14.762376348, 16, 16, 16, 16], degree=3))
            add(Edge.make_bspline(
                [(4.29286859, 3.538461538), (4.179525863, 3.534415374), (3.955517545, 3.526418616), (3.628530442, 3.444778979), (3.314327537, 3.321692549), (3.0222843, 3.1433141), (2.75363347, 2.929575917), (2.522491819, 2.675434215), (2.331542717, 2.387920138), (2.202245643, 2.121786703), (2.120561925, 1.882731149), (2.06662788, 1.673881515), (2.024675333, 1.436505607), (1.985330964, 1.17219849), (1.959651741, 0.879140832), (1.936313535, 0.558688258), (1.925396784, 0.209876945), (1.923869759, -0.031913594), (1.923076923, -0.157451923)],
                knots=[0, 0, 0, 0, 1.090531906, 2.155305635, 3.229839962, 4.33261226, 5.44038871, 6.529323825, 7.629011124, 8.757537029, 9.370236727, 10.061839251, 10.834451254, 11.692844982, 12.636905849, 13.66920014, 14.789842145, 16, 16, 16, 16], degree=3))
            Line((1.923076923, -0.157451923), (1.923076923, -3))
            Line((1.923076923, -3), (1.025641026, -3))
            Line((1.025641026, -3), (1.025641026, 0.715945513))
            add(Edge.make_bspline(
                [(1.025641026, 0.715945513), (1.02541408, 0.820783566), (1.024977459, 1.022481444), (1.017330838, 1.311720516), (1.002797634, 1.574809317), (0.985996067, 1.81144207), (0.961824128, 2.021188724), (0.934367665, 2.205173747), (0.901943064, 2.362935893), (0.848257679, 2.535974135), (0.766216341, 2.726605344), (0.634249878, 2.929865404), (0.469656791, 3.107774254), (0.276597146, 3.259656393), (0.059438054, 3.385203482), (-0.18051452, 3.475659916), (-0.441099985, 3.528300743), (-0.620750573, 3.535010734), (-0.713141026, 3.538461538)],
                knots=[0, 0, 0, 0, 1.320475261, 2.540461679, 3.643808994, 4.639130445, 5.527981419, 6.302341397, 6.981980563, 7.553956391, 8.582137848, 9.585246428, 10.591171744, 11.620968678, 12.668337649, 13.738356861, 14.836885341, 16, 16, 16, 16], degree=3))
            add(Edge.make_bspline(
                [(-0.713141026, 3.538461538), (-0.821758773, 3.534088796), (-1.038230085, 3.525374074), (-1.356235713, 3.446933292), (-1.663337666, 3.324064507), (-1.954636805, 3.153607881), (-2.222277229, 2.942467656), (-2.456586564, 2.694139383), (-2.653565209, 2.411713573), (-2.784227537, 2.148386383), (-2.868508892, 1.915319883), (-2.924495562, 1.717174318), (-2.972608779, 1.497173609), (-3.008363126, 1.254639006), (-3.0428786, 0.991150165), (-3.059536626, 0.70539448), (-3.075741089, 0.397617087), (-3.076519417, 0.1851241), (-3.076923077, 0.074919872)],
                knots=[0, 0, 0, 0, 1.098833095, 2.189935336, 3.297829714, 4.440610912, 5.596351641, 6.740013378, 7.886572111, 9.072425424, 9.705826452, 10.395263256, 11.156850408, 11.985370555, 12.878090359, 13.847760091, 14.883794034, 16, 16, 16, 16], degree=3))
            Line((-3.076923077, 0.074919872), (-3.076923077, -3))
            Line((-3.076923077, -3), (-3.974358974, -3))
            Line((-3.974358974, -3), (-3.974358974, 4.307692308))
        make_face(mode=Mode.SUBTRACT)
    extrude(amount=-CUT_EXTRUDE2_DEPTH, mode=Mode.SUBTRACT)


solid = part.part
